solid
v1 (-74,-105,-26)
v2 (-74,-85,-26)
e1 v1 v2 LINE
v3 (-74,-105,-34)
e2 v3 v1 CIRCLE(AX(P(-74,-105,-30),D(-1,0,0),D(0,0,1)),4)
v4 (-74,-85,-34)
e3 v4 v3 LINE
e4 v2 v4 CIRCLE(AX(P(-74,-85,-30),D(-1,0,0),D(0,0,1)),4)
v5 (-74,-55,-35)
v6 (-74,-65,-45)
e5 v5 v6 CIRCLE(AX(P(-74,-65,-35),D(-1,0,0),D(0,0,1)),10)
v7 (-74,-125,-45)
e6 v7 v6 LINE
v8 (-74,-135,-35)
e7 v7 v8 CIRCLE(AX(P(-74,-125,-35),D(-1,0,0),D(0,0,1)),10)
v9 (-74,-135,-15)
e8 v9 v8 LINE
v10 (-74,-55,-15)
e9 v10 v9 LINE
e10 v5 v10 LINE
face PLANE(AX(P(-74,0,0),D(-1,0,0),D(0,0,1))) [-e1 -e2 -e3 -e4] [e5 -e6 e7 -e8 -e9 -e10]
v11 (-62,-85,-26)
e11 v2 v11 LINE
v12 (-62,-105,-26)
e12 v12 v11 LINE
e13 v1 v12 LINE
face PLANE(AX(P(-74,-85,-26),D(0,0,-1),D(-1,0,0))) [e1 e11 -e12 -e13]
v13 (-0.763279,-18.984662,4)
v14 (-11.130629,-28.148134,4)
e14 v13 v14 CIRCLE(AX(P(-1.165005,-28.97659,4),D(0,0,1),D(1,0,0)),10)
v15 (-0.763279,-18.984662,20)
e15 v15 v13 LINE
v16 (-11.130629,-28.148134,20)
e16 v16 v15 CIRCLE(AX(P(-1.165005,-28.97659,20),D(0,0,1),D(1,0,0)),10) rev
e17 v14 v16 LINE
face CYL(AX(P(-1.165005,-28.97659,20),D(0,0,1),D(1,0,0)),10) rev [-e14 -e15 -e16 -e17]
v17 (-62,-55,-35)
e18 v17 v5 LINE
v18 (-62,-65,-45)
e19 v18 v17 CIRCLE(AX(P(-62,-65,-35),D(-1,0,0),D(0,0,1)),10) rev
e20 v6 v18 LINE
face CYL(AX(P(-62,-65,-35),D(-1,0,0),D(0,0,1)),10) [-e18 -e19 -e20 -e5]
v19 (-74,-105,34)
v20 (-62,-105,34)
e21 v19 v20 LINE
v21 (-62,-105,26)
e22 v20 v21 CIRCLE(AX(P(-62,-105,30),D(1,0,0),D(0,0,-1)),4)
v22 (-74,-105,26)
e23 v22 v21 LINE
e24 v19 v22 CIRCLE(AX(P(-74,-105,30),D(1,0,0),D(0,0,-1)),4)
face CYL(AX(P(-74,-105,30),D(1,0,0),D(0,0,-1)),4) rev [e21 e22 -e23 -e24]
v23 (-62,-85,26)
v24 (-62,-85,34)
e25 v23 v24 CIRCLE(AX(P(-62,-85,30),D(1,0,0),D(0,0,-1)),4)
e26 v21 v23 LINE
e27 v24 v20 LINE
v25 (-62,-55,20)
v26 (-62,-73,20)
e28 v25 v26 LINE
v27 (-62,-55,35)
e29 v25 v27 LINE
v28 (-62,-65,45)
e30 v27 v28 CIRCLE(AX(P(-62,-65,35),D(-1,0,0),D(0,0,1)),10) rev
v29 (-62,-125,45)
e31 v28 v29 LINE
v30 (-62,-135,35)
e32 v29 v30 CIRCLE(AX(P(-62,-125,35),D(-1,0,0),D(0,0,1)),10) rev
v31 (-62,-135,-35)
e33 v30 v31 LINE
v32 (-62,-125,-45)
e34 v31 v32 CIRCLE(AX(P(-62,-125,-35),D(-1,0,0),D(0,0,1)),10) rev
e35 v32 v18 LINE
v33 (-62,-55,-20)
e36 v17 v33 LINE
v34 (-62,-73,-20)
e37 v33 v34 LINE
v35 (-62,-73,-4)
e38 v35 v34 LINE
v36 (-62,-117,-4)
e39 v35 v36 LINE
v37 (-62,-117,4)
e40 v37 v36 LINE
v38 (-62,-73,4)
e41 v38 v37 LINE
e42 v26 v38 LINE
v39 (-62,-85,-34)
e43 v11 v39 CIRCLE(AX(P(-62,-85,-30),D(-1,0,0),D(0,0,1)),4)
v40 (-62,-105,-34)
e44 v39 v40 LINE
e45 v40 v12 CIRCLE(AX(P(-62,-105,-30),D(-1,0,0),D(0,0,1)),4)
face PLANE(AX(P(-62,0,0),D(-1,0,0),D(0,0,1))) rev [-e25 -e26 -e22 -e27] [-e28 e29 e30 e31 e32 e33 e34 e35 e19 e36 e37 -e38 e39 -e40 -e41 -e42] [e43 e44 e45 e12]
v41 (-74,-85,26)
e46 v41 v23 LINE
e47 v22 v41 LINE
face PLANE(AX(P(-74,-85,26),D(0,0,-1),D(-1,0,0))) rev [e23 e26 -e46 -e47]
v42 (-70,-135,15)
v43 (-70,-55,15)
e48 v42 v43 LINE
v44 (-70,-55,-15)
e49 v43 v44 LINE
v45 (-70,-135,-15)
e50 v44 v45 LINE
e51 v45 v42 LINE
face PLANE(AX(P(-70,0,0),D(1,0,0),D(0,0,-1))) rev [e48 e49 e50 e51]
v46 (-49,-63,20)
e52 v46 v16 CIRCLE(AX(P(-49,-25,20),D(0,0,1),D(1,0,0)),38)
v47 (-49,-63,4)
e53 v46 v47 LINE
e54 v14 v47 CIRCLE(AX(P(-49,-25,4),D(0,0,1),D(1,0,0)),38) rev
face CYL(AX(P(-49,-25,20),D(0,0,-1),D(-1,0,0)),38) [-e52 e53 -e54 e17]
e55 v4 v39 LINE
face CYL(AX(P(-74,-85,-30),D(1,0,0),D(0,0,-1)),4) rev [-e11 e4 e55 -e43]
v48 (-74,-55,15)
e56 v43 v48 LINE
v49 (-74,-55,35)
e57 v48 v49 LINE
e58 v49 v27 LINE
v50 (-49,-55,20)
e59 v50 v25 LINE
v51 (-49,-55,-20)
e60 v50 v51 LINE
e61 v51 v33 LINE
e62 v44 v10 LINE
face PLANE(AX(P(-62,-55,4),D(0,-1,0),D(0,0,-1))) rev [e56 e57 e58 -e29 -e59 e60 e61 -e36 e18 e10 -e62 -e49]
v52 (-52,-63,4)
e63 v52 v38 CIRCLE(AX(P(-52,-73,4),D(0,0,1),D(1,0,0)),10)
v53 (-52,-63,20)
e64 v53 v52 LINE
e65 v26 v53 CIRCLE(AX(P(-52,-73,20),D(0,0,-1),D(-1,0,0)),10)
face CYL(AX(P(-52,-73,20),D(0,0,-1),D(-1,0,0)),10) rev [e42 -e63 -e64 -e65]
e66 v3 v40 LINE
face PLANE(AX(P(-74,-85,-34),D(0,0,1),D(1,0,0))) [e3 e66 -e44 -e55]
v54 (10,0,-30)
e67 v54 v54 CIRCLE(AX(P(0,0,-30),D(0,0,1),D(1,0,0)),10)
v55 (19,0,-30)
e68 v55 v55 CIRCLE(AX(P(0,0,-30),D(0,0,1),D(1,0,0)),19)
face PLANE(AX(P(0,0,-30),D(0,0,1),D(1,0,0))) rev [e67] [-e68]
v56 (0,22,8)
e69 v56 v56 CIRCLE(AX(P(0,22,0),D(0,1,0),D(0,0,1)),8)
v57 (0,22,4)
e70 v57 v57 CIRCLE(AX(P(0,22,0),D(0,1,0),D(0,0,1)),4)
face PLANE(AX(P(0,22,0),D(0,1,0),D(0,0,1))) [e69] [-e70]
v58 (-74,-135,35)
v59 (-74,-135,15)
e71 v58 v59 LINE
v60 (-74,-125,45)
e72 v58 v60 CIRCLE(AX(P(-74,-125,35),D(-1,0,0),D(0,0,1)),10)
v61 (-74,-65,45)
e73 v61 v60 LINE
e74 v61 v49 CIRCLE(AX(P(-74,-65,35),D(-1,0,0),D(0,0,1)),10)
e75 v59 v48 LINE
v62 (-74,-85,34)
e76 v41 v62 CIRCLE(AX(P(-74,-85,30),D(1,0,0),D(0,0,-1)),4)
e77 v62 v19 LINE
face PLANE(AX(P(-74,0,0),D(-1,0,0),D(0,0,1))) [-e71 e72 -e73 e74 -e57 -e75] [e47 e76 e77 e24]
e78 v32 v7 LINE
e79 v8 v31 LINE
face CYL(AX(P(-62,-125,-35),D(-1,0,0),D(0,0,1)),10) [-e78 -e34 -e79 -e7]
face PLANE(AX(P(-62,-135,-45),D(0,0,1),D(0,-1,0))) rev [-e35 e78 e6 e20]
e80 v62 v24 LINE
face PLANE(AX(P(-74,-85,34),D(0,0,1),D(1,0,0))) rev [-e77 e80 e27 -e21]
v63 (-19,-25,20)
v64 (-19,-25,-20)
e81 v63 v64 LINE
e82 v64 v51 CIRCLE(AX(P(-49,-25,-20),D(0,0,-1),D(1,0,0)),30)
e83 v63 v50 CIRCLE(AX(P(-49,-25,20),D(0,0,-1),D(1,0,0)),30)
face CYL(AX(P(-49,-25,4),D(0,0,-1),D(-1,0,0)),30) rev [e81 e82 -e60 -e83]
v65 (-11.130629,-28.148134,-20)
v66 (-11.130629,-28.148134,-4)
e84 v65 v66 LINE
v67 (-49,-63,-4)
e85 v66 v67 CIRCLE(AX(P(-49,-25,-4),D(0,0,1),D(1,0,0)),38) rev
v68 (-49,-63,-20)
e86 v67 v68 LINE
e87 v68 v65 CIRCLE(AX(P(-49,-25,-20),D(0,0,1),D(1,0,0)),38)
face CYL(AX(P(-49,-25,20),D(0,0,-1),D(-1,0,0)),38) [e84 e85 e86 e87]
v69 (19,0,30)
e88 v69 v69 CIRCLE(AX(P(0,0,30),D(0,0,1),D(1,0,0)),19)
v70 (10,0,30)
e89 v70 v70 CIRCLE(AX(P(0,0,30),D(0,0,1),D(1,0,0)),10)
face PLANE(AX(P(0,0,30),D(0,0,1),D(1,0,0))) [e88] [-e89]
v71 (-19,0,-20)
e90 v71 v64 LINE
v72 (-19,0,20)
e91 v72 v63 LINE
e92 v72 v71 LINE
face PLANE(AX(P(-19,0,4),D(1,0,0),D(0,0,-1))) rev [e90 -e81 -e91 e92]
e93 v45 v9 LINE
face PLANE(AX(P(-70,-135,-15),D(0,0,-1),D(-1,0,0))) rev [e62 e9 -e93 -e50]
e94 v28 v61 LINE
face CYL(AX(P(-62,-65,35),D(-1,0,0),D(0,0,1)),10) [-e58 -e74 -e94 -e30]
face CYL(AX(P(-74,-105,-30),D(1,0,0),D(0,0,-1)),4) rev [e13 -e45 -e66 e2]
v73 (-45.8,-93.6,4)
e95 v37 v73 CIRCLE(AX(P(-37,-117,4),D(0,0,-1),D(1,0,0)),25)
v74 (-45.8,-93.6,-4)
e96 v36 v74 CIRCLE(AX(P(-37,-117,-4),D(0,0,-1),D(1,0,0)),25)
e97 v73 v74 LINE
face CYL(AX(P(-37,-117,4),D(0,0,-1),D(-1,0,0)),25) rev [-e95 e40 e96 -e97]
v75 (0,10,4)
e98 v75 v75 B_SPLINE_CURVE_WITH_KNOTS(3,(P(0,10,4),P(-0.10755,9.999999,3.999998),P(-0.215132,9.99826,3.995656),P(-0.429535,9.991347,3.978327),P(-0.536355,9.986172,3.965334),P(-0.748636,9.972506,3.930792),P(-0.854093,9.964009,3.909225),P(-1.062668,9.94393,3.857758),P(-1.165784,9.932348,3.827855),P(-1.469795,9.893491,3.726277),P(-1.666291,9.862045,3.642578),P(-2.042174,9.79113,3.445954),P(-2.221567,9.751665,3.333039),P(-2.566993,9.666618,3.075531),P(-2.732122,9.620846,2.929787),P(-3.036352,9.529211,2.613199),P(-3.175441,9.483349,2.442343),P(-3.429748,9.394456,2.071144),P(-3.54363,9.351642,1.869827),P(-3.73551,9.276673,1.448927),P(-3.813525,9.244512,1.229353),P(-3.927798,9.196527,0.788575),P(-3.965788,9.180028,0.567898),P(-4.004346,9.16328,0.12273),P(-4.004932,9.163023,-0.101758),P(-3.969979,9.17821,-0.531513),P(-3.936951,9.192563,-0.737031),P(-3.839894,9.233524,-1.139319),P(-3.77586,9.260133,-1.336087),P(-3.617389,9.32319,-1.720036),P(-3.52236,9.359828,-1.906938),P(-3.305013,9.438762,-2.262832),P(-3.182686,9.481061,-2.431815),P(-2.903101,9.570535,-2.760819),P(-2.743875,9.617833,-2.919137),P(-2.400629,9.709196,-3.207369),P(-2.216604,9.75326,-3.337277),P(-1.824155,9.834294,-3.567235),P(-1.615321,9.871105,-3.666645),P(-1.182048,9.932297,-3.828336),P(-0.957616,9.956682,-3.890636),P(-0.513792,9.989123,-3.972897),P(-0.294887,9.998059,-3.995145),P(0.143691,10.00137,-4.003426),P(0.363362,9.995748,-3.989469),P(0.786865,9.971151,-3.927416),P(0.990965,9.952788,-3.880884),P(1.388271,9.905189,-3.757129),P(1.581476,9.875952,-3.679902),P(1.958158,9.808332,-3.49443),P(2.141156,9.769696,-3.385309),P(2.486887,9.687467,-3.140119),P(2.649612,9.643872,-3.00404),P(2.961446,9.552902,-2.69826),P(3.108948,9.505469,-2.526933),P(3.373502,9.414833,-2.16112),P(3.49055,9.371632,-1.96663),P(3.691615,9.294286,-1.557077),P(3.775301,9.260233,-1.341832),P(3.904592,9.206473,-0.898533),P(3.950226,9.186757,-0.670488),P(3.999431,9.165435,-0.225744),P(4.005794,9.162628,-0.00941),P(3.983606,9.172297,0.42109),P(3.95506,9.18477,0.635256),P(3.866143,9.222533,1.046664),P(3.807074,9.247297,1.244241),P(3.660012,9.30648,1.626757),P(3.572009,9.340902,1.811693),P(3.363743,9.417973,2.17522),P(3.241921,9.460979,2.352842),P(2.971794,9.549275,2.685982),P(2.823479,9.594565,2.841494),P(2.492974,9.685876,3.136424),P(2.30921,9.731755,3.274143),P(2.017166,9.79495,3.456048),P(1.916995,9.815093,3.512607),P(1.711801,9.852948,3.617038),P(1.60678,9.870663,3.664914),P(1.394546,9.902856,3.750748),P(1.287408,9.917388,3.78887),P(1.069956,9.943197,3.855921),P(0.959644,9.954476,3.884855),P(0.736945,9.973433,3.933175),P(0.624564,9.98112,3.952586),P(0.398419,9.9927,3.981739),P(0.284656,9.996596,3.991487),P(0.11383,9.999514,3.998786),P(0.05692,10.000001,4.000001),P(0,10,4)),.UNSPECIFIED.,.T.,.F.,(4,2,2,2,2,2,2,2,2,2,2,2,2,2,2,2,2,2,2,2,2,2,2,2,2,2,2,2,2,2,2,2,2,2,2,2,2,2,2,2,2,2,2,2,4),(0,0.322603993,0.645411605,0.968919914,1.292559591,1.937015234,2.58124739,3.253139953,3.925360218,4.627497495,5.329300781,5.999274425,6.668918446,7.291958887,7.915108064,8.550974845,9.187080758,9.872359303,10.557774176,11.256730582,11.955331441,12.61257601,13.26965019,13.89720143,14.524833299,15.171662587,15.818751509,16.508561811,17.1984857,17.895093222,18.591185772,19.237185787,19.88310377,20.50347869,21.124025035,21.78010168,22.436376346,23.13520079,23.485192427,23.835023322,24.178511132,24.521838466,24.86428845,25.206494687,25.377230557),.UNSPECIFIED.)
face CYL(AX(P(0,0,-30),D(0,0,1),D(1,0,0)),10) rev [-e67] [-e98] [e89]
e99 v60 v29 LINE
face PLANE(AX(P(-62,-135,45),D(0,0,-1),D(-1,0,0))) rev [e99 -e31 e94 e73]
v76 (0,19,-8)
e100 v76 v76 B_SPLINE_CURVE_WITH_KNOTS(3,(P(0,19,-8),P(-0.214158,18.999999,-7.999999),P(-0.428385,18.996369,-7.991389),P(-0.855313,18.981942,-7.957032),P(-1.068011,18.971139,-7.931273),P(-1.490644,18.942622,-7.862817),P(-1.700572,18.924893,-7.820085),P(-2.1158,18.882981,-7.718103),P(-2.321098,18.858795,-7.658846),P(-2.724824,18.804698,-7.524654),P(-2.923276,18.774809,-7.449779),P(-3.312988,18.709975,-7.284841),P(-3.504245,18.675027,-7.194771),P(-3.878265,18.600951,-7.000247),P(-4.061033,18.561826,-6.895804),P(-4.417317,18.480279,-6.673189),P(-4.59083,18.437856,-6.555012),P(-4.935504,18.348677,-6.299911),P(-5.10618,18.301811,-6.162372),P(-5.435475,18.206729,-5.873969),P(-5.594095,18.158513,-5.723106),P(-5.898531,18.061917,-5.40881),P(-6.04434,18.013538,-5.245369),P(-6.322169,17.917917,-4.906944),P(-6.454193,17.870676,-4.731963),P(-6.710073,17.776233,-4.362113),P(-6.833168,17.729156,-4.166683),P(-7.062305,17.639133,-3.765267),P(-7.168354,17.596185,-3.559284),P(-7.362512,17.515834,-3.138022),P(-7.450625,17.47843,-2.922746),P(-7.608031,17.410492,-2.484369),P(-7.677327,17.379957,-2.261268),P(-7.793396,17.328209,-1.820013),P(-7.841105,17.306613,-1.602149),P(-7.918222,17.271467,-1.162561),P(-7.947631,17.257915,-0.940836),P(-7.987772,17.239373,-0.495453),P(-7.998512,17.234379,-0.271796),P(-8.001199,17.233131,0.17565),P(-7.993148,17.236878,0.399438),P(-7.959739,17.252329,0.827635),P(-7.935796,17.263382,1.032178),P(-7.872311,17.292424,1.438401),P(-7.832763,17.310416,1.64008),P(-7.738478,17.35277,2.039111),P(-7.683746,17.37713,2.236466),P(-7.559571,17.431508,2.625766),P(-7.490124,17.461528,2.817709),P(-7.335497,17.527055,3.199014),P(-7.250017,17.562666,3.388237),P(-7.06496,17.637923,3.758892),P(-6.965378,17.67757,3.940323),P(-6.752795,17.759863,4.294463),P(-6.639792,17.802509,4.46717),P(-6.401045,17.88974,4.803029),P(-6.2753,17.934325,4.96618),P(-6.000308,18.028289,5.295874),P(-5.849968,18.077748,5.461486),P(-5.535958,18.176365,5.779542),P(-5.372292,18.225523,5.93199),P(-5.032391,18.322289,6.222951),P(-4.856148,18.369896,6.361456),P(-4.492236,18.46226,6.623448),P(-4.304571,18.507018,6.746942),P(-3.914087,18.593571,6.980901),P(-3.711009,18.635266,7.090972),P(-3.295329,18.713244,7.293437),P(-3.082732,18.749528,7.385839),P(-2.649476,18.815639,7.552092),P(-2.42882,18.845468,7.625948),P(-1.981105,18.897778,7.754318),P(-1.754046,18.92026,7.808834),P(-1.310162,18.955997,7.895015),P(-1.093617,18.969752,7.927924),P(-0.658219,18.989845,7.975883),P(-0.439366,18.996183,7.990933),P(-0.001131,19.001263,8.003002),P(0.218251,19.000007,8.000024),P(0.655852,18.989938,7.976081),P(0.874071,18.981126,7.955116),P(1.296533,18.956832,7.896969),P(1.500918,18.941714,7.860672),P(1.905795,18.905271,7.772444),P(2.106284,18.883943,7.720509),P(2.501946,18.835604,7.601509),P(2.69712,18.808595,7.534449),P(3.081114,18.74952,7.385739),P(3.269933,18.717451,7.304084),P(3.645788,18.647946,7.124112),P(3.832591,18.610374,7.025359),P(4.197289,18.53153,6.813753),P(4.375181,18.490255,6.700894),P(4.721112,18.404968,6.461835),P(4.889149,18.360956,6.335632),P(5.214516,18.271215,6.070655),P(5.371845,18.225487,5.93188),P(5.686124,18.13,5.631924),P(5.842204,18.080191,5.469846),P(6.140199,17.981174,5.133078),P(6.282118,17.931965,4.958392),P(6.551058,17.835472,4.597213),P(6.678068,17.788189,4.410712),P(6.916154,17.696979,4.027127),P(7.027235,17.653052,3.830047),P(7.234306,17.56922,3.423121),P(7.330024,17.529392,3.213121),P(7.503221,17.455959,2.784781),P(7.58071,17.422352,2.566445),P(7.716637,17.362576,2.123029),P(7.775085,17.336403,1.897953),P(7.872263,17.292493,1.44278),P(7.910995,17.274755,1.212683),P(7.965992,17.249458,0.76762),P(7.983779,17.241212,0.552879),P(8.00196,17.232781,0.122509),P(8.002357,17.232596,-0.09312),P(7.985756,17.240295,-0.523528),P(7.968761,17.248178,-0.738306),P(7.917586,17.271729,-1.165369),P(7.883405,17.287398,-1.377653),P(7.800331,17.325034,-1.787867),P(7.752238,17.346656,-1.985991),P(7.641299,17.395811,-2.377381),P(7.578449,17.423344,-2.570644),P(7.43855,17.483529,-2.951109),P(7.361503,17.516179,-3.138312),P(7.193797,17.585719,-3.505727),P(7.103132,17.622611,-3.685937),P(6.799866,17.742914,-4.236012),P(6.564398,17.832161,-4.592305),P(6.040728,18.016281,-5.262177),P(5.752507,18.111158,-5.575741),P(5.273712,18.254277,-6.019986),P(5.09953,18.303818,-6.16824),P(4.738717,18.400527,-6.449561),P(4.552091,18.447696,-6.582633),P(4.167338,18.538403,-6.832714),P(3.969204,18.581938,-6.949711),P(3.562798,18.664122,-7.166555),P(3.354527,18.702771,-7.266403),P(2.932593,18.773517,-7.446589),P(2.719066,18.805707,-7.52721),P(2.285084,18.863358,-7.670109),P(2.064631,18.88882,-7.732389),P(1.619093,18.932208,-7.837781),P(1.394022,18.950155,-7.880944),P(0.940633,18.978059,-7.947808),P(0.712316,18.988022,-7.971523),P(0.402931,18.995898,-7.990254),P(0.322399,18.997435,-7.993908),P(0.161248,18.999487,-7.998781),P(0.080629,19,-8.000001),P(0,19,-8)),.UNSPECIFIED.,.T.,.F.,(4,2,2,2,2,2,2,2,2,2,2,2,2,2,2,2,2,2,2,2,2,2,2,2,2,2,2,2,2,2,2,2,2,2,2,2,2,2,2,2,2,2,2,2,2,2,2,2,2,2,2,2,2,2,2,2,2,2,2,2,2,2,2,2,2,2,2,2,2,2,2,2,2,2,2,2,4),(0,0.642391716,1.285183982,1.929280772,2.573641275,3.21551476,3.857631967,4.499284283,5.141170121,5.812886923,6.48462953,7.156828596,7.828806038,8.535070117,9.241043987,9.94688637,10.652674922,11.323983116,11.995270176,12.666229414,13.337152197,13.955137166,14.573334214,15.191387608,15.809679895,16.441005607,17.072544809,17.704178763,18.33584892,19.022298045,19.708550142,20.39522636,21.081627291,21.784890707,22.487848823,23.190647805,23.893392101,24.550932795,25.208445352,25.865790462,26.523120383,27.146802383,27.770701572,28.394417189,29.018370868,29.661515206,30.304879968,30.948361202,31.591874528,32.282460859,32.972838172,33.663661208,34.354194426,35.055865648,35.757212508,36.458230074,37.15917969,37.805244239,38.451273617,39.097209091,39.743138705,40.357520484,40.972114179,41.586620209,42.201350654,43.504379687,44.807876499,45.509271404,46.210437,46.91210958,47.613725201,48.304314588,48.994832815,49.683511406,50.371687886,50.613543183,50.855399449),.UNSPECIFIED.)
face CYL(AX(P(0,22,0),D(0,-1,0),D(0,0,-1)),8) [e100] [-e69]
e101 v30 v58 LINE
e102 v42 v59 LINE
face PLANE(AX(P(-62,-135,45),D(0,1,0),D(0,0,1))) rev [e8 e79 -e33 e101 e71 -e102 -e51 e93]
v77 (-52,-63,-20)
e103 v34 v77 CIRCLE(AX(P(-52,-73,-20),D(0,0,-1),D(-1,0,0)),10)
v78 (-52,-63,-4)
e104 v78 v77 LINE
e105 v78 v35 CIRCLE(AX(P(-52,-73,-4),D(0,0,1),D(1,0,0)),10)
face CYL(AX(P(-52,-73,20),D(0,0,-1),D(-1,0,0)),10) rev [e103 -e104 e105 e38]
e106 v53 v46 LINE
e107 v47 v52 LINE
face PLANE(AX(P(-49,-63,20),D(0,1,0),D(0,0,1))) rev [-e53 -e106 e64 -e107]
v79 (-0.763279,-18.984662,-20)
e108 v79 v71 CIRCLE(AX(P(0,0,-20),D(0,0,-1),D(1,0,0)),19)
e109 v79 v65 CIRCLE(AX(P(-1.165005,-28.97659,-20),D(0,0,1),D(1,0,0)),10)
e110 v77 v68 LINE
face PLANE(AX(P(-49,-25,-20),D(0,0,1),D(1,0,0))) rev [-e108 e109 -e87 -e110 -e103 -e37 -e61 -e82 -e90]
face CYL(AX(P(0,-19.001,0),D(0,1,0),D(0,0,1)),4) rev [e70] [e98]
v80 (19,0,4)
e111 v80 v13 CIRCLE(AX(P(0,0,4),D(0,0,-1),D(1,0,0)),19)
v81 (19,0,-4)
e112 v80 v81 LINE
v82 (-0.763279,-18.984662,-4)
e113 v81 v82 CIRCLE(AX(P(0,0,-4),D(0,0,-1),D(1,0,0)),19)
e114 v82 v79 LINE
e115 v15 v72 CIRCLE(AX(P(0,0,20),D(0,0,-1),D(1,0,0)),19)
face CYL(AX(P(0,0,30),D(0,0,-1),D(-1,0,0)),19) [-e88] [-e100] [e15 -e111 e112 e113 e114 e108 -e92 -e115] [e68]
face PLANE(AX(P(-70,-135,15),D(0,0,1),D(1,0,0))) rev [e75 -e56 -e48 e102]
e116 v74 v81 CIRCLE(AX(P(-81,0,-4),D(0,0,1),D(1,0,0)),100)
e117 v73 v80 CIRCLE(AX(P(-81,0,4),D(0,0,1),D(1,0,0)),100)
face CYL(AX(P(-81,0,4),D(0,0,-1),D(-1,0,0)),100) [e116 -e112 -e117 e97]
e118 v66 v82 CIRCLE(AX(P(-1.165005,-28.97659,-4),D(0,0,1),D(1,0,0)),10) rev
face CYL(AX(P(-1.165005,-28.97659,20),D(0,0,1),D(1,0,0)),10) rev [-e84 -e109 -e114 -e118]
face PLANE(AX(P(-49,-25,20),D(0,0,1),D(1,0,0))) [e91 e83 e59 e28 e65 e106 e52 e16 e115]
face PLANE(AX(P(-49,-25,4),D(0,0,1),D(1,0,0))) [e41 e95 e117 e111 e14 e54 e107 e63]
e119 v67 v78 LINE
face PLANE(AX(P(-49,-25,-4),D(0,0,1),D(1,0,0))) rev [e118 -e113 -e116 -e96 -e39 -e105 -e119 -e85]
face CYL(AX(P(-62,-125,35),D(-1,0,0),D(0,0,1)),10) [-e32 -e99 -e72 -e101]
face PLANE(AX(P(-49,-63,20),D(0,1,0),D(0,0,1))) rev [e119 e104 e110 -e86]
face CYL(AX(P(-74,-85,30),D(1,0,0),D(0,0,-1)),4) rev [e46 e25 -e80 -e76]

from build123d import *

# Parameters (mm, degrees)
SKETCH_1_R               = 19
EXTRUDE_1_DEPTH          = 30
SKETCH_2_R               = 8
EXTRUDE_2_DEPTH          = 22
SKETCH_3_R               = 10
CUT_EXTRUDE_1_DEPTH      = 67.670833355
CUT_EXTRUDE_2_REACH      = 56.24
CUT_EXTRUDE_2_END_RADIUS = 10
SKETCH_4_R               = 4
EXTRUDE_START            = -74
SKETCH_5_W               = 90
SKETCH_5_H               = 80
EXTRUDE_3_DEPTH          = 12
FILLET_1_R               = 10
SKETCH_6_W               = 30
SKETCH_6_H               = 80
CUT_EXTRUDE_3_DEPTH      = 4
CUT_EXTRUDE_4_DEPTH      = 164.740648637
EXTRUDE_4_DEPTH          = 4
EXTRUDE_5_DEPTH          = 20
FILLET_2_R               = 10


with BuildPart() as part:
    # 草图1 → 凸台-拉伸1 (new, symmetric)
    with BuildSketch(Plane.XY):
        Circle(SKETCH_1_R)
    extrude(amount=EXTRUDE_1_DEPTH, both=True)

    # 草图2 → 凸台-拉伸2 (add)
    with BuildSketch(Plane(origin=(0, 0, 0), x_dir=(1, 0, 0), z_dir=(0, 1, 0))):
        with Locations(Location((0, 0, 0), (0, 0, 90))):
            Circle(SKETCH_2_R)
    extrude(amount=EXTRUDE_2_DEPTH)

    # 草图3 → 切除-拉伸1 (cut, through all)
    with BuildSketch(Plane.XY.offset(30)):
        Circle(SKETCH_3_R)
    extrude(amount=-CUT_EXTRUDE_1_DEPTH, mode=Mode.SUBTRACT)

    # 切除-拉伸2: up to this cylinder (the profile starts outside it)
    cut_extrude_2_end = Plane(origin=(0, 0, 0), z_dir=(0, 0, 1)) * Cylinder(CUT_EXTRUDE_2_END_RADIUS, 133.48, mode=Mode.PRIVATE)
    # 草图4 → 切除-拉伸2 (cut, up to the surface)
    with BuildSketch(Plane(origin=(0, 22, 0), x_dir=(1, 0, 0), z_dir=(0, 1, 0)), mode=Mode.PRIVATE) as cut_extrude_2_sk1:
        with Locations(Location((0, 0, 0), (0, 0, 270))):
            Circle(SKETCH_4_R)
    cut_extrude_2_tool1 = extrude(cut_extrude_2_sk1.sketch, amount=-CUT_EXTRUDE_2_REACH, mode=Mode.PRIVATE) - cut_extrude_2_end
    add(cut_extrude_2_tool1.solids().sort_by_distance((0, 22, 0))[0], mode=Mode.SUBTRACT)



with BuildPart() as body_2:
    # 草图5 → 凸台-拉伸3 (new body)
    with BuildSketch(Plane(origin=(0, 0, 0), x_dir=(0, 0, -1), z_dir=(1, 0, 0)).offset(EXTRUDE_START)):
        with Locations((0, -95)):
            Rectangle(SKETCH_5_W, SKETCH_5_H)
    extrude(amount=EXTRUDE_3_DEPTH)

    # 圆角1
    fillet_1_edges = [body_2.edges().sort_by_distance(p)[0] for p in [
        (-68, -135, -45),
        (-68, -135, 45),
        (-68, -55, 45),
        (-68, -55, -45),
    ]]
    fillet(fillet_1_edges, radius=FILLET_1_R)

    # 草图6 → 切除-拉伸3 (cut)
    with BuildSketch(Plane.ZY.offset(74)):
        with Locations((0, -95)):
            Rectangle(SKETCH_6_W, SKETCH_6_H)
    extrude(amount=-CUT_EXTRUDE_3_DEPTH, mode=Mode.SUBTRACT)

    # 草图7 → 切除-拉伸4 (cut, through all)
    with BuildSketch(Plane(origin=(-62, 0, 0), x_dir=(0, 0, -1), z_dir=(1, 0, 0))):
        with BuildLine():
            Line((-26, -85), (-26, -105))
            ThreePointArc((-26, -105), (-30, -109), (-34, -105))
            Line((-34, -105), (-34, -85))
            ThreePointArc((-34, -85), (-30, -81), (-26, -85))
        make_face()
    cut_extrude_4 = extrude(amount=-CUT_EXTRUDE_4_DEPTH, mode=Mode.SUBTRACT)

    # 镜向1: 切除-拉伸4 across plane
    add(cut_extrude_4.mirror(Plane.XY), mode=Mode.SUBTRACT)


with BuildPart() as part_1:
    add(part.part)

    add(body_2.part)  # 凸台-拉伸4 merges body 2
    # 草图8 → 凸台-拉伸4 (add, symmetric)
    with BuildSketch(Plane.XY):
        with BuildLine():
            Line((-19, 0), (-19, -25))
            ThreePointArc((-19, -25), (-27.786796564, -46.213203436), (-49, -55))
            Line((-49, -55), (-62, -55))
            Line((-62, -55), (-62, -117))
            ThreePointArc((-62, -117), (-57.554804791, -102.769750529), (-45.8, -93.6))
            ThreePointArc((-45.8, -93.6), (1.219219164, -56.920997883), (19, 0))
            ThreePointArc((19, 0), (0, -19), (-19, 0))
        make_face()
    extrude(amount=EXTRUDE_4_DEPTH, both=True)

    # 草图9 → 凸台-拉伸5 (add, symmetric)
    with BuildSketch(Plane.XY):
        with BuildLine():
            Line((-49, -55), (-62, -55))
            Line((-62, -55), (-62, -73))
            ThreePointArc((-62, -73), (-59.071067812, -65.928932188), (-52, -63))
            Line((-52, -63), (-49, -63))
            ThreePointArc((-49, -63), (-22.129942315, -51.870057685), (-11, -25))
            Line((-11, -25), (-11, -15.491933385))
            ThreePointArc((-11, -15.491933385), (-16.881943016, -8.717797887), (-19, 0))
            Line((-19, 0), (-19, -25))
            ThreePointArc((-19, -25), (-27.786796564, -46.213203436), (-49, -55))
        make_face()
    extrude(amount=EXTRUDE_5_DEPTH, both=True)

    # 圆角2
    # the kernel refuses this fillet: 10 mm, written as the material it adds along each edge
    with BuildSketch(Plane(origin=(-11, -15.491933385, -20), x_dir=(0.9464272027660603, -0.32291724925189497, 0), z_dir=(0, 0, 1))) as fillet_2_piece_1_section:
        with BuildLine():
            CenterArc((13.662534862, -9.586356274), FILLET_2_R, 106.537100336, 87.550188329)
            Line((3.963274477, -12.020354626), (2.993348438, -12.263754461))
            ThreePointArc((2.993348438, -12.263754461), (2.123891514, -9.32161014), (-0.946427203, -0.322917249))
            Line((-0.946427203, -0.322917249), (0.284636143, 0.958635627))
            ThreePointArc((0.284636143, 0.958635627), (5.408086716, 0.214076921), (10.531537289, 0.958635627))
            Line((10.531537289, 0.958635627), (10.816173432, 0))
        make_face()
    fillet_2_piece_1 = extrude(amount=47.642186032, mode=Mode.PRIVATE)
    fillet_2_piece_1 = split(fillet_2_piece_1, bisect_by=Plane(origin=(-8.746000777, -19.792422089, 20), z_dir=(0, 0, -1)), keep=Keep.TOP, mode=Mode.PRIVATE)
    add(fillet_2_piece_1)
    with BuildSketch(Plane(origin=(-11, -15.491933385, -27.642186032), x_dir=(0.9464272027660603, -0.32291724925189513, 0), z_dir=(0, 0, 1))) as fillet_2_piece_2_section:
        with BuildLine():
            CenterArc((13.662534862, -9.586356274), FILLET_2_R, 106.537100336, 87.550188329)
            Line((3.963274477, -12.020354626), (2.993348438, -12.263754461))
            ThreePointArc((2.993348438, -12.263754461), (2.123891514, -9.32161014), (-0.946427203, -0.322917249))
            Line((-0.946427203, -0.322917249), (0.284636143, 0.958635627))
            ThreePointArc((0.284636143, 0.958635627), (5.408086716, 0.214076921), (10.531537289, 0.958635627))
            Line((10.531537289, 0.958635627), (10.816173432, 0))
        make_face()
    fillet_2_piece_2 = extrude(amount=47.642186032, mode=Mode.PRIVATE)
    fillet_2_piece_2 = split(fillet_2_piece_2, bisect_by=Plane(origin=(-8.746000777, -19.792422089, -20), z_dir=(0, 0, 1)), keep=Keep.TOP, mode=Mode.PRIVATE)
    add(fillet_2_piece_2)


solid = part_1.part
